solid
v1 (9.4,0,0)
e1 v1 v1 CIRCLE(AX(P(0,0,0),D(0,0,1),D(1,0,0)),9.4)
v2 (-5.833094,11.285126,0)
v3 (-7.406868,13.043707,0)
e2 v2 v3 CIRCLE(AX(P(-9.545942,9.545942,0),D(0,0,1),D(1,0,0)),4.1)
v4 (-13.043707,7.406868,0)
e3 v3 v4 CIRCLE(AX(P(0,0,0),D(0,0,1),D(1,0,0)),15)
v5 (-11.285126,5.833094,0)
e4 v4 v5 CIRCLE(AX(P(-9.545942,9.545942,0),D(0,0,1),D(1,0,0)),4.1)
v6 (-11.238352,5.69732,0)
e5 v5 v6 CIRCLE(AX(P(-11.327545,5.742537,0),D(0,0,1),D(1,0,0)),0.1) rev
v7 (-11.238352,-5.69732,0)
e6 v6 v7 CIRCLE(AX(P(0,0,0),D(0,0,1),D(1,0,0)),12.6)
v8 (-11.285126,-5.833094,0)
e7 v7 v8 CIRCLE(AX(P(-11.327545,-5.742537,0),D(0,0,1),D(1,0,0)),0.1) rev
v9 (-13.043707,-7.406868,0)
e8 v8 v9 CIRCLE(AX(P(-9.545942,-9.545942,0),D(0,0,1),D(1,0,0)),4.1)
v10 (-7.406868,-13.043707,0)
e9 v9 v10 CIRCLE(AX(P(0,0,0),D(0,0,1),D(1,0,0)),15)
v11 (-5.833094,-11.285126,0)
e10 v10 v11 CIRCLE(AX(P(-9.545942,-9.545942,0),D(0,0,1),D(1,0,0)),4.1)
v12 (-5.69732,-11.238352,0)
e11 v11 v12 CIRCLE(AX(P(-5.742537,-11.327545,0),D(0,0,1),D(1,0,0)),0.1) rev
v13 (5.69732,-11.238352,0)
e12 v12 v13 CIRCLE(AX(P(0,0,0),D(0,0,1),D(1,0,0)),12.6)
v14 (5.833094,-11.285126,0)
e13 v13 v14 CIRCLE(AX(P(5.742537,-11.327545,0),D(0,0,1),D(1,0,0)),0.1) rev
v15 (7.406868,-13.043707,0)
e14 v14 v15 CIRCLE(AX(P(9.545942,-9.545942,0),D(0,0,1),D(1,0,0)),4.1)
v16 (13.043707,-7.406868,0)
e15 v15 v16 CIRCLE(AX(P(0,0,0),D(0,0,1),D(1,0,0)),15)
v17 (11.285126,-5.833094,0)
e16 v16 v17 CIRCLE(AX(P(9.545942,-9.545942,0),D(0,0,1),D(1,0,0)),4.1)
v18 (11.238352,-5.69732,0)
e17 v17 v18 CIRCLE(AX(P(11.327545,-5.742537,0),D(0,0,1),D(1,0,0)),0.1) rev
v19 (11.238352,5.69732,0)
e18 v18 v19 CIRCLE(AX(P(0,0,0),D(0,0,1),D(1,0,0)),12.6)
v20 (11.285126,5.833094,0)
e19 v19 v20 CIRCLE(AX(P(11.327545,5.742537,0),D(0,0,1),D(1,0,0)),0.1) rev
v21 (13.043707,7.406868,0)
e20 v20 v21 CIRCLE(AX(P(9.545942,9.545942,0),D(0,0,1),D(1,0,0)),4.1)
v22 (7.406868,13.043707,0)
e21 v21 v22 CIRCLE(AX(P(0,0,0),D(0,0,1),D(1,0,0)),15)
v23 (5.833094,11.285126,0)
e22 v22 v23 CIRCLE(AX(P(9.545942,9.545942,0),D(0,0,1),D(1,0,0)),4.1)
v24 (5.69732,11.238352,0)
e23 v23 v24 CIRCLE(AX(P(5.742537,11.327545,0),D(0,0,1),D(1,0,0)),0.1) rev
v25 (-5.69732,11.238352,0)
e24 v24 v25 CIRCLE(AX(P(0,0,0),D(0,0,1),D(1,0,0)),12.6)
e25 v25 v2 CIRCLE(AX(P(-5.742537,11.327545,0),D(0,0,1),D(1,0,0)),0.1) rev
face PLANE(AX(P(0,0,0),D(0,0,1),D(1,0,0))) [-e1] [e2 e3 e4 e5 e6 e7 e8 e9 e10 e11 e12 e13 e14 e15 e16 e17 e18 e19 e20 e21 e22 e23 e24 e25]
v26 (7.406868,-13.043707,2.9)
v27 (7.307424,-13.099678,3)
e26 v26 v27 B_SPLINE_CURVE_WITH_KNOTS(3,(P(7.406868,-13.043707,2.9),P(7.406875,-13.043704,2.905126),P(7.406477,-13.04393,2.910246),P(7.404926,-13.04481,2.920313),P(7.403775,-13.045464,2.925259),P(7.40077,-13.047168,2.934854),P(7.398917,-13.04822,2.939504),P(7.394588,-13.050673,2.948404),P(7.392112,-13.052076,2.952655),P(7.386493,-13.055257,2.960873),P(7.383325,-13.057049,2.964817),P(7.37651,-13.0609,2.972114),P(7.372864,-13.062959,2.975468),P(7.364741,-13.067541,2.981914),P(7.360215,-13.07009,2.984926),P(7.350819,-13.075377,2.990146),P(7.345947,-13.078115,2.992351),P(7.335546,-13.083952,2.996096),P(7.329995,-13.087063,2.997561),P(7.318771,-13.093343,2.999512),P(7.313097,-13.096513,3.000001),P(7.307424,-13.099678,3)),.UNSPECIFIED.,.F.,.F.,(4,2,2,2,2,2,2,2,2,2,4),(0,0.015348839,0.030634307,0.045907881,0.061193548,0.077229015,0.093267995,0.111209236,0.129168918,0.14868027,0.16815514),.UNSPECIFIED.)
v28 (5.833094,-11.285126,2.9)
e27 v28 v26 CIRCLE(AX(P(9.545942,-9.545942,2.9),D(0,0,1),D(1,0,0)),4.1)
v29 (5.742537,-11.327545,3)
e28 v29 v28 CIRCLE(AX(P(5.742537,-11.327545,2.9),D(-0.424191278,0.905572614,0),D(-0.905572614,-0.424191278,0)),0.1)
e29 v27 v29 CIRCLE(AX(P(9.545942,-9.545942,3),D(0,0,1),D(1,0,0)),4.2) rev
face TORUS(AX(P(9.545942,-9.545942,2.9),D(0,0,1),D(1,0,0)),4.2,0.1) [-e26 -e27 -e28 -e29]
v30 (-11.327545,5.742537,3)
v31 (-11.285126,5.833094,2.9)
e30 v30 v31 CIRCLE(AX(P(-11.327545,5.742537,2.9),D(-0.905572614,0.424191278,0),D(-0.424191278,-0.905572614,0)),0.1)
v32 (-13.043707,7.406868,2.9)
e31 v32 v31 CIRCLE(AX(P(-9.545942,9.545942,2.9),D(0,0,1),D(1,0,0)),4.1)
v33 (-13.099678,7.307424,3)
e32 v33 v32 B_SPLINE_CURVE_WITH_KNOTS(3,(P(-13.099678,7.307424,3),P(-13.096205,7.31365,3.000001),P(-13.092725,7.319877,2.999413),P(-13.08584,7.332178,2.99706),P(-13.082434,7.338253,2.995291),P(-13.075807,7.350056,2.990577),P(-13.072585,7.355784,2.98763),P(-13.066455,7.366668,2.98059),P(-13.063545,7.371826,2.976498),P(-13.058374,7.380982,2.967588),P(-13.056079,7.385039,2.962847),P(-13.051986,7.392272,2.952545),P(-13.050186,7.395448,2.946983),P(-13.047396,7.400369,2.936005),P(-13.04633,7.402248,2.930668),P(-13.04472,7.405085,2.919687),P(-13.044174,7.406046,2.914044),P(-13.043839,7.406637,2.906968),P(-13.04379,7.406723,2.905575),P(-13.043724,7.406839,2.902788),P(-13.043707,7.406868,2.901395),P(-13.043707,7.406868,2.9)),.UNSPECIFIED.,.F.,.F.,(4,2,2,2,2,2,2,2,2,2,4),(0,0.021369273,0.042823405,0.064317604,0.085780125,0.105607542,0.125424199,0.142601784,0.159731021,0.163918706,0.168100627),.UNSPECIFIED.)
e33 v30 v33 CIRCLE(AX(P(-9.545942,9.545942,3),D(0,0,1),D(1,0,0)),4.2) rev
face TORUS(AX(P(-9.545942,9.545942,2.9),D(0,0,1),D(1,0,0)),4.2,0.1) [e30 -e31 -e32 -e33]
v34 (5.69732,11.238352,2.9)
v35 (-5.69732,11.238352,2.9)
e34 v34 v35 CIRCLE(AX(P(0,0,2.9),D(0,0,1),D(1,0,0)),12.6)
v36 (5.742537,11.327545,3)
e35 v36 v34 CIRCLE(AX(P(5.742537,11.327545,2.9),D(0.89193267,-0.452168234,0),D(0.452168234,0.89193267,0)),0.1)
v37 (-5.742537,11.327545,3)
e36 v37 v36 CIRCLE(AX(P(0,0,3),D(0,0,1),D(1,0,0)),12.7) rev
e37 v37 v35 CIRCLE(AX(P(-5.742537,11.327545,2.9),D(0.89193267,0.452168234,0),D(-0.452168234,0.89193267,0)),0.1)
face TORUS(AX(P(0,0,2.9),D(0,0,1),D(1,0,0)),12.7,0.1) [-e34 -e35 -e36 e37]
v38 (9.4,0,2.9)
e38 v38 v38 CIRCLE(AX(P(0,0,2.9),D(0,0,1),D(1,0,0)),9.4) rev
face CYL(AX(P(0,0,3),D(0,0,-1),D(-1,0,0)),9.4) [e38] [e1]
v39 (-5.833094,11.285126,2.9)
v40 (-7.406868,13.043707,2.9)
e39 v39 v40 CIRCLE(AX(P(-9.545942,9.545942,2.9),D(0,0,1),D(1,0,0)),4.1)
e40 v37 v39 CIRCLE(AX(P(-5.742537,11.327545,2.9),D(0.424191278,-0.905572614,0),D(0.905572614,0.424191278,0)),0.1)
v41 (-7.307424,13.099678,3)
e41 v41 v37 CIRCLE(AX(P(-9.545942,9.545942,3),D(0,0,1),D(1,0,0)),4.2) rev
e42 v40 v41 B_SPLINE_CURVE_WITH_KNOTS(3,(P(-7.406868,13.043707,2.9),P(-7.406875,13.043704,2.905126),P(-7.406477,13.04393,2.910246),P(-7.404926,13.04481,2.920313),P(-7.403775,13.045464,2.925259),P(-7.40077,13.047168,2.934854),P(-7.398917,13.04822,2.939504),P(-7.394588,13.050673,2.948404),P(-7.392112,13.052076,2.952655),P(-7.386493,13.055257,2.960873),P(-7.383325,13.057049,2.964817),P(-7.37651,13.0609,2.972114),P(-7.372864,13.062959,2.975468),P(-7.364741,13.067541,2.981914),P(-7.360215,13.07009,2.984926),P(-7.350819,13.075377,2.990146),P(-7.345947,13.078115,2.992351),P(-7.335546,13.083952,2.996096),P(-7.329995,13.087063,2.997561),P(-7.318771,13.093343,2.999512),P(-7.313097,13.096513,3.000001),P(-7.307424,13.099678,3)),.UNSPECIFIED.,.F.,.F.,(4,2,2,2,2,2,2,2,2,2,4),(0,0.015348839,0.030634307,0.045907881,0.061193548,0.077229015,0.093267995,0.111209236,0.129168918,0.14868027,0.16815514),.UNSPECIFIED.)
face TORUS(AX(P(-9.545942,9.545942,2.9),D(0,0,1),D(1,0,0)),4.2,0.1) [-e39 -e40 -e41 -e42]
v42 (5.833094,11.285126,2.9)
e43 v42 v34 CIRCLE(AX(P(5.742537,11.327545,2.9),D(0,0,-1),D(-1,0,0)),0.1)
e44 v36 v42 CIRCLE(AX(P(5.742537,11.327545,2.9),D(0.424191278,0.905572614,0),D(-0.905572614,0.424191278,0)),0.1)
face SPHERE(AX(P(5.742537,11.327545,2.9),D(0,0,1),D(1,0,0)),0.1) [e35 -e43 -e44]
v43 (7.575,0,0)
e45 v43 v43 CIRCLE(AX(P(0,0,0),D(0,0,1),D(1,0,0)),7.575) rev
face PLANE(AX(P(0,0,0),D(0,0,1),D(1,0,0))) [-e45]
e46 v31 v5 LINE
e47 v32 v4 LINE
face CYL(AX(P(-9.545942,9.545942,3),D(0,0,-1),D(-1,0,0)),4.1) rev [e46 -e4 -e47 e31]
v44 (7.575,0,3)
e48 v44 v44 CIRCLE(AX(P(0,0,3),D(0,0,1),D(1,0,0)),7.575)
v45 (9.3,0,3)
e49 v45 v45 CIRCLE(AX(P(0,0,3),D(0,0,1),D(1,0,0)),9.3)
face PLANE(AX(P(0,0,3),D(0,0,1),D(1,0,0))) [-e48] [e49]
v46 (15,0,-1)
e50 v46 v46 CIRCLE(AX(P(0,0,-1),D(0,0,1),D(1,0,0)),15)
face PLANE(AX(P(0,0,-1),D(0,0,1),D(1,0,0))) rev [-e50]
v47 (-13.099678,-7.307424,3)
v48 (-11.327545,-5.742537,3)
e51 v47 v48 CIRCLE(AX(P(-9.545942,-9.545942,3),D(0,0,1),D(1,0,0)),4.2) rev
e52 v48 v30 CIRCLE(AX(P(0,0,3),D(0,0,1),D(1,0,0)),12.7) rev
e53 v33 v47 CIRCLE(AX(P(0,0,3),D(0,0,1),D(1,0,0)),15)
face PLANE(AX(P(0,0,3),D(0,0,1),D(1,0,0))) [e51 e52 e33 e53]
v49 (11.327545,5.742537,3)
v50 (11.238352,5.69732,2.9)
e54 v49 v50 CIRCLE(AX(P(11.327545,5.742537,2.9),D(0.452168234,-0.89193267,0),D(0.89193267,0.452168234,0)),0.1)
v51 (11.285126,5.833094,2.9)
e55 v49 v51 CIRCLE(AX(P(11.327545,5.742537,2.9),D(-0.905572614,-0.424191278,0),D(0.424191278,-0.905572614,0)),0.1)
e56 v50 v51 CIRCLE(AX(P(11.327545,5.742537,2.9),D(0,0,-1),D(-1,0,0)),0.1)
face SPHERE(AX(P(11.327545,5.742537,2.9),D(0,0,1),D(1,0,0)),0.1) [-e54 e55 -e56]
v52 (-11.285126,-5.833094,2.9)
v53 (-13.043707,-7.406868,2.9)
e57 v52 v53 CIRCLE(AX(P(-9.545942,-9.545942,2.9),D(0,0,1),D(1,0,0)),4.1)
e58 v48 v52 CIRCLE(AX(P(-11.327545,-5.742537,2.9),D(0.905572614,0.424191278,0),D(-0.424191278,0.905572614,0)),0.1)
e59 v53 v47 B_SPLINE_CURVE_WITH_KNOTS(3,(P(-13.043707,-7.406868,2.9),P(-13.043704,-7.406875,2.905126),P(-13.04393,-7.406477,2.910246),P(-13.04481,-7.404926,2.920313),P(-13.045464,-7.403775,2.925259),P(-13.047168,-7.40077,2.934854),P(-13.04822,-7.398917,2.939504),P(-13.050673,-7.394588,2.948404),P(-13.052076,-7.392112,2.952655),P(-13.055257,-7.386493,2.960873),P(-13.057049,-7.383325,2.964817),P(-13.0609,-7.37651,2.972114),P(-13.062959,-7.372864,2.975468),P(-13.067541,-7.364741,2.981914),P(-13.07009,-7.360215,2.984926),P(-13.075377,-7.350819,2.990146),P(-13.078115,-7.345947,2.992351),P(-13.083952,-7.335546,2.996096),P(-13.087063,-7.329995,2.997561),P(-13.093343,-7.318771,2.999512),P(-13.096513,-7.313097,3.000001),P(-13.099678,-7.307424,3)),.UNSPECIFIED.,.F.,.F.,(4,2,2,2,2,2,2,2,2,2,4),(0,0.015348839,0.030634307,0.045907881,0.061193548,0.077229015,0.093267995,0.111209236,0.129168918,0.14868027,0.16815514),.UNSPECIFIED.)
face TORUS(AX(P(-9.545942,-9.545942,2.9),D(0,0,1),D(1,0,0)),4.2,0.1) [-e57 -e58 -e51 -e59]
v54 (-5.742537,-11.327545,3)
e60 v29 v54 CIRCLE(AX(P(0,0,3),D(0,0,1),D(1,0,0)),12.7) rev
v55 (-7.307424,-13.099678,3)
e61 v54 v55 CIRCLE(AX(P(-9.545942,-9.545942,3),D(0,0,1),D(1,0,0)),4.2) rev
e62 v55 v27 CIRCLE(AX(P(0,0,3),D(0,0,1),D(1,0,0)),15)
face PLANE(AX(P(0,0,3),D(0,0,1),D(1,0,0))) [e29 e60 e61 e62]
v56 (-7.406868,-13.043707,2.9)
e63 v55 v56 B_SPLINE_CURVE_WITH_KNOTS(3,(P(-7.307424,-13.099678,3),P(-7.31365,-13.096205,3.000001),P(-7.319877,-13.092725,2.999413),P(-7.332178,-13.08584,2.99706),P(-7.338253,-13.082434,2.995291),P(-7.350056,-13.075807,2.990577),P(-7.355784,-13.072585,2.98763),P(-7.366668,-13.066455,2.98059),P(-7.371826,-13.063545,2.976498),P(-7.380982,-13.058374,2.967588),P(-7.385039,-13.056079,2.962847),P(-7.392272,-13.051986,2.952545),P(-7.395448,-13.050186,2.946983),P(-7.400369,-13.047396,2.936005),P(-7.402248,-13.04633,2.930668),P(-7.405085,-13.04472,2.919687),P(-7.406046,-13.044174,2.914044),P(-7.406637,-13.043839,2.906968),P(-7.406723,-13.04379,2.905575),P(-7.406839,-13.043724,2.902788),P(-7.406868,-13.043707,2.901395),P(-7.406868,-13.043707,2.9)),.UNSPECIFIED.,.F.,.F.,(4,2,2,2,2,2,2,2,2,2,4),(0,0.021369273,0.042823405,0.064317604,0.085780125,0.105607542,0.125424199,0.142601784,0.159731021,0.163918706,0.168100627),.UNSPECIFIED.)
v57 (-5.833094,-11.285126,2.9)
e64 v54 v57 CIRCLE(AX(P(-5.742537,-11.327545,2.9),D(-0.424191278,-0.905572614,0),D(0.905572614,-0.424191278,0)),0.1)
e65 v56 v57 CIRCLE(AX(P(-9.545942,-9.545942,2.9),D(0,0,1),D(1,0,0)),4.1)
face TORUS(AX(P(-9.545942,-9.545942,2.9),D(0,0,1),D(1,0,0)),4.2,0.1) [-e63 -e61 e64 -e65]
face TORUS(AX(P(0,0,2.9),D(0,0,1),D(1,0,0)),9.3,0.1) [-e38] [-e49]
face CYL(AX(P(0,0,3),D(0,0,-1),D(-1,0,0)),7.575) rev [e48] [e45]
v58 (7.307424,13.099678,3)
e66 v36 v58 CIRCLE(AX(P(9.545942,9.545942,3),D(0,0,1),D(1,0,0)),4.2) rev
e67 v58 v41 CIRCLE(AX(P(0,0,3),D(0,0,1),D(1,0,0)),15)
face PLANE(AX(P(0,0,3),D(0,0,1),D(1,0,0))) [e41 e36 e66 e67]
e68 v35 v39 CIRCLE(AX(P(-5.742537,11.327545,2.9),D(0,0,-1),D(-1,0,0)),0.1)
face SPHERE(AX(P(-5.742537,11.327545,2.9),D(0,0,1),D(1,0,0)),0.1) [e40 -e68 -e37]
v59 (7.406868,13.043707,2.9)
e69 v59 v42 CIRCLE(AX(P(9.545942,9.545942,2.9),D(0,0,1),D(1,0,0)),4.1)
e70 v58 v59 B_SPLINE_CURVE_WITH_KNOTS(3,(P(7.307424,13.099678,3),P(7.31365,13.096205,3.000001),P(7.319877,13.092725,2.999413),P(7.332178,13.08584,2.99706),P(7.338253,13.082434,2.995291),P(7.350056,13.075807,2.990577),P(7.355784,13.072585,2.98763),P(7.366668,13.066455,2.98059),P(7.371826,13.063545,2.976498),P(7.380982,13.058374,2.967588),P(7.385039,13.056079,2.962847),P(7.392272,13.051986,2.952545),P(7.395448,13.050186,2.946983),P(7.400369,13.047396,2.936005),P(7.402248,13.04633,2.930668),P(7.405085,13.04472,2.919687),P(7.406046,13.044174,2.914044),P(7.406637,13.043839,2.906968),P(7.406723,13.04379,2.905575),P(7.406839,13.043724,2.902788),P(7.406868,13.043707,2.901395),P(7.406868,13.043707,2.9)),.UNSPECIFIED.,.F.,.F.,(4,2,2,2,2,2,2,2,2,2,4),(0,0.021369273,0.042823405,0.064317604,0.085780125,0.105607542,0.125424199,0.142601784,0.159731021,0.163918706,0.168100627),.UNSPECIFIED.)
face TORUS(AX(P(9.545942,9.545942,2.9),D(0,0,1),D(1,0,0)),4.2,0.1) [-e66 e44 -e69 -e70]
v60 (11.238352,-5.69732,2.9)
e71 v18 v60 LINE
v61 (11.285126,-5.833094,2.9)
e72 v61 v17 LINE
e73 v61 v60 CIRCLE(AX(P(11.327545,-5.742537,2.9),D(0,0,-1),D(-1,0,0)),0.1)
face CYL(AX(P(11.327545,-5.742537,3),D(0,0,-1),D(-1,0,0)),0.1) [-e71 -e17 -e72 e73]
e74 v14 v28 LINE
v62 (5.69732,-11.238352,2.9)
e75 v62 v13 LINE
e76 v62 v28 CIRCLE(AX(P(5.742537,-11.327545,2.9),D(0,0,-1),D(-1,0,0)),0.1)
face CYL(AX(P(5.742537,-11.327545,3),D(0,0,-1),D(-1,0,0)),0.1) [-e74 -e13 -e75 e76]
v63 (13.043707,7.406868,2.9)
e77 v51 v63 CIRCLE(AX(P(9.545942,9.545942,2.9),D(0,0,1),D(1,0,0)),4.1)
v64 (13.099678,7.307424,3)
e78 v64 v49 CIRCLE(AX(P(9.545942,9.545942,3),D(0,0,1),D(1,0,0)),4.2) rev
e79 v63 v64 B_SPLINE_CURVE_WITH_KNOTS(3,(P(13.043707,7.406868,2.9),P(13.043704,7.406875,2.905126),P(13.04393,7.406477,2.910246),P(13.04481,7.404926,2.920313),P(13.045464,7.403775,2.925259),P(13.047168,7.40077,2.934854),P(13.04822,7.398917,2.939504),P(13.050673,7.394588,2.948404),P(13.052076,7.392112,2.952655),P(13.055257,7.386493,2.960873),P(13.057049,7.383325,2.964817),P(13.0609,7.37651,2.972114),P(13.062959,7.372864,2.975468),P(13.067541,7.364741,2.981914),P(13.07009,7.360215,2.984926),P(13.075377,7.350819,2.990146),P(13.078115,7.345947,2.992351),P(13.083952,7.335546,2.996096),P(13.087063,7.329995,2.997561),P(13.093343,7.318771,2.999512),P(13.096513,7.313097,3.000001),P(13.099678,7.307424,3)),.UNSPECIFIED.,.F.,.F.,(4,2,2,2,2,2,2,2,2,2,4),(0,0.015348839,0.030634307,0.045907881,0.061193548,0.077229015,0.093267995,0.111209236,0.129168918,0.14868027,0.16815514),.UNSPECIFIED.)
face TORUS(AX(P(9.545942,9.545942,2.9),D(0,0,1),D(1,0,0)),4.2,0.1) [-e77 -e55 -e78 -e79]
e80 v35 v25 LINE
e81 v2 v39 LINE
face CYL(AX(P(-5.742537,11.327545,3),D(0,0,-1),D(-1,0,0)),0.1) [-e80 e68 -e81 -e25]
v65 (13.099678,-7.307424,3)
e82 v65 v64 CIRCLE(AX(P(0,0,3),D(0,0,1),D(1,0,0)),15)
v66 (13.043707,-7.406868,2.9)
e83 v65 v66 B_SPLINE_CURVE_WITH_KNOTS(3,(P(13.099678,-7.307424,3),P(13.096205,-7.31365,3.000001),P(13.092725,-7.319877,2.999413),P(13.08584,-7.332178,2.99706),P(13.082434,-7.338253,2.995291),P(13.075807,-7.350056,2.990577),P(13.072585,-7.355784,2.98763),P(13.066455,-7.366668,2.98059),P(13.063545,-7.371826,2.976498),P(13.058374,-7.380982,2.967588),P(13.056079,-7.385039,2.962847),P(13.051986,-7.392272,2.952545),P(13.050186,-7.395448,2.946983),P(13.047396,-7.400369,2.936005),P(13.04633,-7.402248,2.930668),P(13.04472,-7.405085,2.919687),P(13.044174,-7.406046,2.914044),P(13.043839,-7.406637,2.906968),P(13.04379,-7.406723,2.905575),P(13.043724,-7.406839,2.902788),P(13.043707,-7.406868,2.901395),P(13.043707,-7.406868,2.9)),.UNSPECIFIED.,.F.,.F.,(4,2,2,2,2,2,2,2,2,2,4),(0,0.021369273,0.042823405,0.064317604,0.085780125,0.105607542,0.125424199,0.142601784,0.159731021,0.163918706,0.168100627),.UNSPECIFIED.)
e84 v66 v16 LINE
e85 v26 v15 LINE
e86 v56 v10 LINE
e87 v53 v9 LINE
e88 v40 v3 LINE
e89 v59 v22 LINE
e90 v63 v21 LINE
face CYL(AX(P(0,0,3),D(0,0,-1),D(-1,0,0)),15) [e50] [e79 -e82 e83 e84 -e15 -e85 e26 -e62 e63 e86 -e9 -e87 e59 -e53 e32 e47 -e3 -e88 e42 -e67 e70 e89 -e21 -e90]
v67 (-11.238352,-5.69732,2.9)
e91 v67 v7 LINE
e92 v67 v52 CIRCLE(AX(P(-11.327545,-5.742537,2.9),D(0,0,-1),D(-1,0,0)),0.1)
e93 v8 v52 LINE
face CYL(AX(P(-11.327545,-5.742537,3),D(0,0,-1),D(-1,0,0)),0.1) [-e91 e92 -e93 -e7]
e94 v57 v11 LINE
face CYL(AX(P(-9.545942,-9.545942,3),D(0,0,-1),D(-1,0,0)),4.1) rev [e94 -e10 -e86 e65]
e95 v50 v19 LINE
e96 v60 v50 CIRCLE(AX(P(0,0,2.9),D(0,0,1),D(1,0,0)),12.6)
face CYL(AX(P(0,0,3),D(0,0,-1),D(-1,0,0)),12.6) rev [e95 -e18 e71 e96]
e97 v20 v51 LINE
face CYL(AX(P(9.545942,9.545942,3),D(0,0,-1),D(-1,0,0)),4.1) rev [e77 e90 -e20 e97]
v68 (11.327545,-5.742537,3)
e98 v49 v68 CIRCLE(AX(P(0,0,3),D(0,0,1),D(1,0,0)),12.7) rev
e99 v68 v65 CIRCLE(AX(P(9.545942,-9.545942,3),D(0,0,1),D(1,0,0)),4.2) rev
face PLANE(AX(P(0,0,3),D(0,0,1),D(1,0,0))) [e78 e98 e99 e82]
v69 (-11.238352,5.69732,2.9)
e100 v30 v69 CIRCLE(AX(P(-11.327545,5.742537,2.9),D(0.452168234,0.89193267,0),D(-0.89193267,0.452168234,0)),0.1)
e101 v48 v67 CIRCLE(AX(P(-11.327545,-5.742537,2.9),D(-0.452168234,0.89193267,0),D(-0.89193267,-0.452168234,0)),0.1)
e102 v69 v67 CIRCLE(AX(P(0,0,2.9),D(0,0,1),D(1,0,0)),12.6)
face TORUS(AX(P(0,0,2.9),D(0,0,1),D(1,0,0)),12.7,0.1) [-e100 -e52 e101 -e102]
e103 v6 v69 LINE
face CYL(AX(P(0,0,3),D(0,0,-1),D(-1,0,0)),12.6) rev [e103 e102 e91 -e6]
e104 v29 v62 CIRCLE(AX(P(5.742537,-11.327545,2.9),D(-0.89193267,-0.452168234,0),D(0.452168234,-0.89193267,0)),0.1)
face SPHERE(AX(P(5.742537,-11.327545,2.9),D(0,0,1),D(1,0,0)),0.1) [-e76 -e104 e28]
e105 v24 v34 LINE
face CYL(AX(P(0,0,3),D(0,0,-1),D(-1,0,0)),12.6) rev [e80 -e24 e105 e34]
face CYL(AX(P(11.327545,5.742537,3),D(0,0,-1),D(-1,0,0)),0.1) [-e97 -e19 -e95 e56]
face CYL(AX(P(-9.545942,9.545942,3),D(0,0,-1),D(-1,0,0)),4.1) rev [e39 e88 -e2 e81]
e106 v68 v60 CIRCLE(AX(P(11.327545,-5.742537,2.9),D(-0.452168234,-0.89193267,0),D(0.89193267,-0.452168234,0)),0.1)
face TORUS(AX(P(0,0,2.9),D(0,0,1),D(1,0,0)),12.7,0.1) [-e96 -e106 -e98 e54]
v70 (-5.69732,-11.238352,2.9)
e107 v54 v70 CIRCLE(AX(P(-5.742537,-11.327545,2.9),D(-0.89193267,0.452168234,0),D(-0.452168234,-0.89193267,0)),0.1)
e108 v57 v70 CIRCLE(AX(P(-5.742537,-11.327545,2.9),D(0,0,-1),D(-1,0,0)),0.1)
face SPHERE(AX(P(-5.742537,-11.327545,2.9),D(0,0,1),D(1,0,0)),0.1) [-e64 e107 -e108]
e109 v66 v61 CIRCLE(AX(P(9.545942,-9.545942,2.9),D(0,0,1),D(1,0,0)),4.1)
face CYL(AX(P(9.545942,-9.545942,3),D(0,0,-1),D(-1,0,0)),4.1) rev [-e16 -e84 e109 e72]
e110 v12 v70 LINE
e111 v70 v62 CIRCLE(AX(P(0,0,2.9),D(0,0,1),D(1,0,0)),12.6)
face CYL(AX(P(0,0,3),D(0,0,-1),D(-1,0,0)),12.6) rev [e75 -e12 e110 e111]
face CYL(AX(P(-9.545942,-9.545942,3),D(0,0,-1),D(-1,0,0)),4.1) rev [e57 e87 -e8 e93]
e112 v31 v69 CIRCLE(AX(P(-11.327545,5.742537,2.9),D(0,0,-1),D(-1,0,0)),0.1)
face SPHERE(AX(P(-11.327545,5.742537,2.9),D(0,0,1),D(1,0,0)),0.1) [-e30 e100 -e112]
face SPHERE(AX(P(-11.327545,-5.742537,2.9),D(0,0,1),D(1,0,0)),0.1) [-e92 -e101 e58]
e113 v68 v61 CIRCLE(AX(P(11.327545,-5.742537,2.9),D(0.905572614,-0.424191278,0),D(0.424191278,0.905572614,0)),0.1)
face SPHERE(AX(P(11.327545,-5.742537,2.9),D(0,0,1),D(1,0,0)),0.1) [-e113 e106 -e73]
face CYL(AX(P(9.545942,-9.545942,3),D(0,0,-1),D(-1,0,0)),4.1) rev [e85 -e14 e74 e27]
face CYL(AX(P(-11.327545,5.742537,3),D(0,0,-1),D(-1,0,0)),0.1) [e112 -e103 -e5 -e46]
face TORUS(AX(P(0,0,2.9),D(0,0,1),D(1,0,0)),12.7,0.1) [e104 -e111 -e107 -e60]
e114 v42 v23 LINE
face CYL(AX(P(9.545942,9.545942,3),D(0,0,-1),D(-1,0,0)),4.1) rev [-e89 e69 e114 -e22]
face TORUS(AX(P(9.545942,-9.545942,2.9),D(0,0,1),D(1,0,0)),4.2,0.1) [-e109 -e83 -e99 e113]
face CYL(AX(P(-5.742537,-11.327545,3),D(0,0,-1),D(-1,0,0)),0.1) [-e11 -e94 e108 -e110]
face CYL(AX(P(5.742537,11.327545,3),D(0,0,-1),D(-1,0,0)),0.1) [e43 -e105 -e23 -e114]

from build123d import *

# Parameters (mm, degrees)
BOSS_EXTRUDE1_DEPTH   = 3
BOSS_EXTRUDE1_2_DEPTH = 3
BOSS_EXTRUDE1_3_DEPTH = 3
BOSS_EXTRUDE1_4_DEPTH = 3
SKETCH1_R             = 9.4
SKETCH1_R_2           = 7.575
BOSS_EXTRUDE1_5_DEPTH = 3
BOSS_EXTRUDE2_START   = -1
SKETCH2_R             = 15
BOSS_EXTRUDE2_DEPTH   = 1
FILLET1_R             = 0.1
FILLET2_R             = 0.1


with BuildPart() as part:
    # Sketch1 → Boss-Extrude1 (new body)
    with BuildSketch(Plane.XY):
        with BuildLine():
            ThreePointArc((5.790318529, 11.190719876), (6.456402483, 12.241261263), (7.406868315, 13.043707363))
            ThreePointArc((7.406868315, 13.043707363), (0, 15), (-7.406868315, 13.043707363))
            ThreePointArc((-7.406868315, 13.043707363), (-6.456402483, 12.241261263), (-5.790318529, 11.190719876))
            ThreePointArc((-5.790318529, 11.190719876), (0, 12.6), (5.790318529, 11.190719876))
        make_face()
    extrude(amount=BOSS_EXTRUDE1_DEPTH)



with BuildPart() as body_2:
    # Sketch1 → Boss-Extrude1 2 (new body)
    with BuildSketch(Plane.XY):
        with BuildLine():
            ThreePointArc((13.043707363, -7.406868315), (14.502682691, -3.830430103), (15, 0))
            ThreePointArc((15, 0), (14.502682691, 3.830430103), (13.043707363, 7.406868315))
            ThreePointArc((13.043707363, 7.406868315), (12.241261263, 6.456402483), (11.190719876, 5.790318529))
            ThreePointArc((11.190719876, 5.790318529), (12.6, 0), (11.190719876, -5.790318529))
            ThreePointArc((11.190719876, -5.790318529), (12.241261263, -6.456402483), (13.043707363, -7.406868315))
        make_face()
    extrude(amount=BOSS_EXTRUDE1_2_DEPTH)


with BuildPart() as body_3:
    # Sketch1 → Boss-Extrude1 3 (new body)
    with BuildSketch(Plane.XY):
        with BuildLine():
            ThreePointArc((-7.406868315, -13.043707363), (0, -15), (7.406868315, -13.043707363))
            ThreePointArc((7.406868315, -13.043707363), (6.456402483, -12.241261263), (5.790318529, -11.190719876))
            ThreePointArc((5.790318529, -11.190719876), (0, -12.6), (-5.790318529, -11.190719876))
            ThreePointArc((-5.790318529, -11.190719876), (-6.456402483, -12.241261263), (-7.406868315, -13.043707363))
        make_face()
    extrude(amount=BOSS_EXTRUDE1_3_DEPTH)


with BuildPart() as body_4:
    # Sketch1 → Boss-Extrude1 4 (new body)
    with BuildSketch(Plane.XY):
        with BuildLine():
            ThreePointArc((-11.190719876, 5.790318529), (-12.241261263, 6.456402483), (-13.043707363, 7.406868315))
            ThreePointArc((-13.043707363, 7.406868315), (-15, 0), (-13.043707363, -7.406868315))
            ThreePointArc((-13.043707363, -7.406868315), (-12.241261263, -6.456402483), (-11.190719876, -5.790318529))
            ThreePointArc((-11.190719876, -5.790318529), (-12.6, 0), (-11.190719876, 5.790318529))
        make_face()
    extrude(amount=BOSS_EXTRUDE1_4_DEPTH)


with BuildPart() as body_5:
    # Sketch1 → Boss-Extrude1 5 (new body)
    with BuildSketch(Plane.XY):
        Circle(SKETCH1_R)
        Circle(SKETCH1_R_2, mode=Mode.SUBTRACT)
    extrude(amount=BOSS_EXTRUDE1_5_DEPTH)


with BuildPart() as part_1:
    add(part.part)

    add(body_2.part)  # Boss-Extrude2 merges body 2

    add(body_3.part)  # Boss-Extrude2 merges body 3

    add(body_4.part)  # Boss-Extrude2 merges body 4

    add(body_5.part)  # Boss-Extrude2 merges body 5
    # Sketch2 → Boss-Extrude2 (add)
    with BuildSketch(Plane.XY.offset(BOSS_EXTRUDE2_START)):
        with Locations(Location((0, 0, 0), (0, 0, 150.409926376))):
            Circle(SKETCH2_R)
    extrude(amount=BOSS_EXTRUDE2_DEPTH)

    # Fillet1
    fillet1_edges = [part_1.edges().sort_by_distance(p)[0] for p in [
        (11.190719876, 5.790318529, 1.5),
        (11.190719876, -5.790318529, 1.5),
        (5.790318529, -11.190719876, 1.5),
        (-5.790318529, -11.190719876, 1.5),
        (-11.190719876, -5.790318529, 1.5),
        (-11.190719876, 5.790318529, 1.5),
        (5.790318529, 11.190719876, 1.5),
        (-5.790318529, 11.190719876, 1.5),
    ]]
    fillet(fillet1_edges, radius=FILLET1_R)

    # Fillet2
    fillet2_edges = [part_1.edges().sort_by_distance(p)[0] for p in [
        (6.490717006, 12.280096445, 3),
        (12.280096445, -6.490717006, 3),
        (-6.490717006, -12.280096445, 3),
        (-12.280096445, 6.490717006, 3),
        (-9.4, 0, 3),
        (0, -12.6, 3),
        (6.490717006, -12.280096445, 3),
        (5.775107932, -11.232998068, 3),
        (-5.775107932, -11.232998068, 3),
        (12.6, 0, 3),
        (12.280096445, 6.490717006, 3),
        (11.232998068, 5.775107932, 3),
        (11.232998068, -5.775107932, 3),
        (0, 12.6, 3),
        (-6.490717006, 12.280096445, 3),
        (-5.775107932, 11.232998068, 3),
        (5.775107932, 11.232998068, 3),
        (-12.6, 0, 3),
        (-12.280096445, -6.490717006, 3),
        (-11.232998068, -5.775107932, 3),
        (-11.232998068, 5.775107932, 3),
    ]]
    fillet(fillet2_edges, radius=FILLET2_R - 0.0001)  # a hair under: the kernel refuses the full size


solid = part_1.part
